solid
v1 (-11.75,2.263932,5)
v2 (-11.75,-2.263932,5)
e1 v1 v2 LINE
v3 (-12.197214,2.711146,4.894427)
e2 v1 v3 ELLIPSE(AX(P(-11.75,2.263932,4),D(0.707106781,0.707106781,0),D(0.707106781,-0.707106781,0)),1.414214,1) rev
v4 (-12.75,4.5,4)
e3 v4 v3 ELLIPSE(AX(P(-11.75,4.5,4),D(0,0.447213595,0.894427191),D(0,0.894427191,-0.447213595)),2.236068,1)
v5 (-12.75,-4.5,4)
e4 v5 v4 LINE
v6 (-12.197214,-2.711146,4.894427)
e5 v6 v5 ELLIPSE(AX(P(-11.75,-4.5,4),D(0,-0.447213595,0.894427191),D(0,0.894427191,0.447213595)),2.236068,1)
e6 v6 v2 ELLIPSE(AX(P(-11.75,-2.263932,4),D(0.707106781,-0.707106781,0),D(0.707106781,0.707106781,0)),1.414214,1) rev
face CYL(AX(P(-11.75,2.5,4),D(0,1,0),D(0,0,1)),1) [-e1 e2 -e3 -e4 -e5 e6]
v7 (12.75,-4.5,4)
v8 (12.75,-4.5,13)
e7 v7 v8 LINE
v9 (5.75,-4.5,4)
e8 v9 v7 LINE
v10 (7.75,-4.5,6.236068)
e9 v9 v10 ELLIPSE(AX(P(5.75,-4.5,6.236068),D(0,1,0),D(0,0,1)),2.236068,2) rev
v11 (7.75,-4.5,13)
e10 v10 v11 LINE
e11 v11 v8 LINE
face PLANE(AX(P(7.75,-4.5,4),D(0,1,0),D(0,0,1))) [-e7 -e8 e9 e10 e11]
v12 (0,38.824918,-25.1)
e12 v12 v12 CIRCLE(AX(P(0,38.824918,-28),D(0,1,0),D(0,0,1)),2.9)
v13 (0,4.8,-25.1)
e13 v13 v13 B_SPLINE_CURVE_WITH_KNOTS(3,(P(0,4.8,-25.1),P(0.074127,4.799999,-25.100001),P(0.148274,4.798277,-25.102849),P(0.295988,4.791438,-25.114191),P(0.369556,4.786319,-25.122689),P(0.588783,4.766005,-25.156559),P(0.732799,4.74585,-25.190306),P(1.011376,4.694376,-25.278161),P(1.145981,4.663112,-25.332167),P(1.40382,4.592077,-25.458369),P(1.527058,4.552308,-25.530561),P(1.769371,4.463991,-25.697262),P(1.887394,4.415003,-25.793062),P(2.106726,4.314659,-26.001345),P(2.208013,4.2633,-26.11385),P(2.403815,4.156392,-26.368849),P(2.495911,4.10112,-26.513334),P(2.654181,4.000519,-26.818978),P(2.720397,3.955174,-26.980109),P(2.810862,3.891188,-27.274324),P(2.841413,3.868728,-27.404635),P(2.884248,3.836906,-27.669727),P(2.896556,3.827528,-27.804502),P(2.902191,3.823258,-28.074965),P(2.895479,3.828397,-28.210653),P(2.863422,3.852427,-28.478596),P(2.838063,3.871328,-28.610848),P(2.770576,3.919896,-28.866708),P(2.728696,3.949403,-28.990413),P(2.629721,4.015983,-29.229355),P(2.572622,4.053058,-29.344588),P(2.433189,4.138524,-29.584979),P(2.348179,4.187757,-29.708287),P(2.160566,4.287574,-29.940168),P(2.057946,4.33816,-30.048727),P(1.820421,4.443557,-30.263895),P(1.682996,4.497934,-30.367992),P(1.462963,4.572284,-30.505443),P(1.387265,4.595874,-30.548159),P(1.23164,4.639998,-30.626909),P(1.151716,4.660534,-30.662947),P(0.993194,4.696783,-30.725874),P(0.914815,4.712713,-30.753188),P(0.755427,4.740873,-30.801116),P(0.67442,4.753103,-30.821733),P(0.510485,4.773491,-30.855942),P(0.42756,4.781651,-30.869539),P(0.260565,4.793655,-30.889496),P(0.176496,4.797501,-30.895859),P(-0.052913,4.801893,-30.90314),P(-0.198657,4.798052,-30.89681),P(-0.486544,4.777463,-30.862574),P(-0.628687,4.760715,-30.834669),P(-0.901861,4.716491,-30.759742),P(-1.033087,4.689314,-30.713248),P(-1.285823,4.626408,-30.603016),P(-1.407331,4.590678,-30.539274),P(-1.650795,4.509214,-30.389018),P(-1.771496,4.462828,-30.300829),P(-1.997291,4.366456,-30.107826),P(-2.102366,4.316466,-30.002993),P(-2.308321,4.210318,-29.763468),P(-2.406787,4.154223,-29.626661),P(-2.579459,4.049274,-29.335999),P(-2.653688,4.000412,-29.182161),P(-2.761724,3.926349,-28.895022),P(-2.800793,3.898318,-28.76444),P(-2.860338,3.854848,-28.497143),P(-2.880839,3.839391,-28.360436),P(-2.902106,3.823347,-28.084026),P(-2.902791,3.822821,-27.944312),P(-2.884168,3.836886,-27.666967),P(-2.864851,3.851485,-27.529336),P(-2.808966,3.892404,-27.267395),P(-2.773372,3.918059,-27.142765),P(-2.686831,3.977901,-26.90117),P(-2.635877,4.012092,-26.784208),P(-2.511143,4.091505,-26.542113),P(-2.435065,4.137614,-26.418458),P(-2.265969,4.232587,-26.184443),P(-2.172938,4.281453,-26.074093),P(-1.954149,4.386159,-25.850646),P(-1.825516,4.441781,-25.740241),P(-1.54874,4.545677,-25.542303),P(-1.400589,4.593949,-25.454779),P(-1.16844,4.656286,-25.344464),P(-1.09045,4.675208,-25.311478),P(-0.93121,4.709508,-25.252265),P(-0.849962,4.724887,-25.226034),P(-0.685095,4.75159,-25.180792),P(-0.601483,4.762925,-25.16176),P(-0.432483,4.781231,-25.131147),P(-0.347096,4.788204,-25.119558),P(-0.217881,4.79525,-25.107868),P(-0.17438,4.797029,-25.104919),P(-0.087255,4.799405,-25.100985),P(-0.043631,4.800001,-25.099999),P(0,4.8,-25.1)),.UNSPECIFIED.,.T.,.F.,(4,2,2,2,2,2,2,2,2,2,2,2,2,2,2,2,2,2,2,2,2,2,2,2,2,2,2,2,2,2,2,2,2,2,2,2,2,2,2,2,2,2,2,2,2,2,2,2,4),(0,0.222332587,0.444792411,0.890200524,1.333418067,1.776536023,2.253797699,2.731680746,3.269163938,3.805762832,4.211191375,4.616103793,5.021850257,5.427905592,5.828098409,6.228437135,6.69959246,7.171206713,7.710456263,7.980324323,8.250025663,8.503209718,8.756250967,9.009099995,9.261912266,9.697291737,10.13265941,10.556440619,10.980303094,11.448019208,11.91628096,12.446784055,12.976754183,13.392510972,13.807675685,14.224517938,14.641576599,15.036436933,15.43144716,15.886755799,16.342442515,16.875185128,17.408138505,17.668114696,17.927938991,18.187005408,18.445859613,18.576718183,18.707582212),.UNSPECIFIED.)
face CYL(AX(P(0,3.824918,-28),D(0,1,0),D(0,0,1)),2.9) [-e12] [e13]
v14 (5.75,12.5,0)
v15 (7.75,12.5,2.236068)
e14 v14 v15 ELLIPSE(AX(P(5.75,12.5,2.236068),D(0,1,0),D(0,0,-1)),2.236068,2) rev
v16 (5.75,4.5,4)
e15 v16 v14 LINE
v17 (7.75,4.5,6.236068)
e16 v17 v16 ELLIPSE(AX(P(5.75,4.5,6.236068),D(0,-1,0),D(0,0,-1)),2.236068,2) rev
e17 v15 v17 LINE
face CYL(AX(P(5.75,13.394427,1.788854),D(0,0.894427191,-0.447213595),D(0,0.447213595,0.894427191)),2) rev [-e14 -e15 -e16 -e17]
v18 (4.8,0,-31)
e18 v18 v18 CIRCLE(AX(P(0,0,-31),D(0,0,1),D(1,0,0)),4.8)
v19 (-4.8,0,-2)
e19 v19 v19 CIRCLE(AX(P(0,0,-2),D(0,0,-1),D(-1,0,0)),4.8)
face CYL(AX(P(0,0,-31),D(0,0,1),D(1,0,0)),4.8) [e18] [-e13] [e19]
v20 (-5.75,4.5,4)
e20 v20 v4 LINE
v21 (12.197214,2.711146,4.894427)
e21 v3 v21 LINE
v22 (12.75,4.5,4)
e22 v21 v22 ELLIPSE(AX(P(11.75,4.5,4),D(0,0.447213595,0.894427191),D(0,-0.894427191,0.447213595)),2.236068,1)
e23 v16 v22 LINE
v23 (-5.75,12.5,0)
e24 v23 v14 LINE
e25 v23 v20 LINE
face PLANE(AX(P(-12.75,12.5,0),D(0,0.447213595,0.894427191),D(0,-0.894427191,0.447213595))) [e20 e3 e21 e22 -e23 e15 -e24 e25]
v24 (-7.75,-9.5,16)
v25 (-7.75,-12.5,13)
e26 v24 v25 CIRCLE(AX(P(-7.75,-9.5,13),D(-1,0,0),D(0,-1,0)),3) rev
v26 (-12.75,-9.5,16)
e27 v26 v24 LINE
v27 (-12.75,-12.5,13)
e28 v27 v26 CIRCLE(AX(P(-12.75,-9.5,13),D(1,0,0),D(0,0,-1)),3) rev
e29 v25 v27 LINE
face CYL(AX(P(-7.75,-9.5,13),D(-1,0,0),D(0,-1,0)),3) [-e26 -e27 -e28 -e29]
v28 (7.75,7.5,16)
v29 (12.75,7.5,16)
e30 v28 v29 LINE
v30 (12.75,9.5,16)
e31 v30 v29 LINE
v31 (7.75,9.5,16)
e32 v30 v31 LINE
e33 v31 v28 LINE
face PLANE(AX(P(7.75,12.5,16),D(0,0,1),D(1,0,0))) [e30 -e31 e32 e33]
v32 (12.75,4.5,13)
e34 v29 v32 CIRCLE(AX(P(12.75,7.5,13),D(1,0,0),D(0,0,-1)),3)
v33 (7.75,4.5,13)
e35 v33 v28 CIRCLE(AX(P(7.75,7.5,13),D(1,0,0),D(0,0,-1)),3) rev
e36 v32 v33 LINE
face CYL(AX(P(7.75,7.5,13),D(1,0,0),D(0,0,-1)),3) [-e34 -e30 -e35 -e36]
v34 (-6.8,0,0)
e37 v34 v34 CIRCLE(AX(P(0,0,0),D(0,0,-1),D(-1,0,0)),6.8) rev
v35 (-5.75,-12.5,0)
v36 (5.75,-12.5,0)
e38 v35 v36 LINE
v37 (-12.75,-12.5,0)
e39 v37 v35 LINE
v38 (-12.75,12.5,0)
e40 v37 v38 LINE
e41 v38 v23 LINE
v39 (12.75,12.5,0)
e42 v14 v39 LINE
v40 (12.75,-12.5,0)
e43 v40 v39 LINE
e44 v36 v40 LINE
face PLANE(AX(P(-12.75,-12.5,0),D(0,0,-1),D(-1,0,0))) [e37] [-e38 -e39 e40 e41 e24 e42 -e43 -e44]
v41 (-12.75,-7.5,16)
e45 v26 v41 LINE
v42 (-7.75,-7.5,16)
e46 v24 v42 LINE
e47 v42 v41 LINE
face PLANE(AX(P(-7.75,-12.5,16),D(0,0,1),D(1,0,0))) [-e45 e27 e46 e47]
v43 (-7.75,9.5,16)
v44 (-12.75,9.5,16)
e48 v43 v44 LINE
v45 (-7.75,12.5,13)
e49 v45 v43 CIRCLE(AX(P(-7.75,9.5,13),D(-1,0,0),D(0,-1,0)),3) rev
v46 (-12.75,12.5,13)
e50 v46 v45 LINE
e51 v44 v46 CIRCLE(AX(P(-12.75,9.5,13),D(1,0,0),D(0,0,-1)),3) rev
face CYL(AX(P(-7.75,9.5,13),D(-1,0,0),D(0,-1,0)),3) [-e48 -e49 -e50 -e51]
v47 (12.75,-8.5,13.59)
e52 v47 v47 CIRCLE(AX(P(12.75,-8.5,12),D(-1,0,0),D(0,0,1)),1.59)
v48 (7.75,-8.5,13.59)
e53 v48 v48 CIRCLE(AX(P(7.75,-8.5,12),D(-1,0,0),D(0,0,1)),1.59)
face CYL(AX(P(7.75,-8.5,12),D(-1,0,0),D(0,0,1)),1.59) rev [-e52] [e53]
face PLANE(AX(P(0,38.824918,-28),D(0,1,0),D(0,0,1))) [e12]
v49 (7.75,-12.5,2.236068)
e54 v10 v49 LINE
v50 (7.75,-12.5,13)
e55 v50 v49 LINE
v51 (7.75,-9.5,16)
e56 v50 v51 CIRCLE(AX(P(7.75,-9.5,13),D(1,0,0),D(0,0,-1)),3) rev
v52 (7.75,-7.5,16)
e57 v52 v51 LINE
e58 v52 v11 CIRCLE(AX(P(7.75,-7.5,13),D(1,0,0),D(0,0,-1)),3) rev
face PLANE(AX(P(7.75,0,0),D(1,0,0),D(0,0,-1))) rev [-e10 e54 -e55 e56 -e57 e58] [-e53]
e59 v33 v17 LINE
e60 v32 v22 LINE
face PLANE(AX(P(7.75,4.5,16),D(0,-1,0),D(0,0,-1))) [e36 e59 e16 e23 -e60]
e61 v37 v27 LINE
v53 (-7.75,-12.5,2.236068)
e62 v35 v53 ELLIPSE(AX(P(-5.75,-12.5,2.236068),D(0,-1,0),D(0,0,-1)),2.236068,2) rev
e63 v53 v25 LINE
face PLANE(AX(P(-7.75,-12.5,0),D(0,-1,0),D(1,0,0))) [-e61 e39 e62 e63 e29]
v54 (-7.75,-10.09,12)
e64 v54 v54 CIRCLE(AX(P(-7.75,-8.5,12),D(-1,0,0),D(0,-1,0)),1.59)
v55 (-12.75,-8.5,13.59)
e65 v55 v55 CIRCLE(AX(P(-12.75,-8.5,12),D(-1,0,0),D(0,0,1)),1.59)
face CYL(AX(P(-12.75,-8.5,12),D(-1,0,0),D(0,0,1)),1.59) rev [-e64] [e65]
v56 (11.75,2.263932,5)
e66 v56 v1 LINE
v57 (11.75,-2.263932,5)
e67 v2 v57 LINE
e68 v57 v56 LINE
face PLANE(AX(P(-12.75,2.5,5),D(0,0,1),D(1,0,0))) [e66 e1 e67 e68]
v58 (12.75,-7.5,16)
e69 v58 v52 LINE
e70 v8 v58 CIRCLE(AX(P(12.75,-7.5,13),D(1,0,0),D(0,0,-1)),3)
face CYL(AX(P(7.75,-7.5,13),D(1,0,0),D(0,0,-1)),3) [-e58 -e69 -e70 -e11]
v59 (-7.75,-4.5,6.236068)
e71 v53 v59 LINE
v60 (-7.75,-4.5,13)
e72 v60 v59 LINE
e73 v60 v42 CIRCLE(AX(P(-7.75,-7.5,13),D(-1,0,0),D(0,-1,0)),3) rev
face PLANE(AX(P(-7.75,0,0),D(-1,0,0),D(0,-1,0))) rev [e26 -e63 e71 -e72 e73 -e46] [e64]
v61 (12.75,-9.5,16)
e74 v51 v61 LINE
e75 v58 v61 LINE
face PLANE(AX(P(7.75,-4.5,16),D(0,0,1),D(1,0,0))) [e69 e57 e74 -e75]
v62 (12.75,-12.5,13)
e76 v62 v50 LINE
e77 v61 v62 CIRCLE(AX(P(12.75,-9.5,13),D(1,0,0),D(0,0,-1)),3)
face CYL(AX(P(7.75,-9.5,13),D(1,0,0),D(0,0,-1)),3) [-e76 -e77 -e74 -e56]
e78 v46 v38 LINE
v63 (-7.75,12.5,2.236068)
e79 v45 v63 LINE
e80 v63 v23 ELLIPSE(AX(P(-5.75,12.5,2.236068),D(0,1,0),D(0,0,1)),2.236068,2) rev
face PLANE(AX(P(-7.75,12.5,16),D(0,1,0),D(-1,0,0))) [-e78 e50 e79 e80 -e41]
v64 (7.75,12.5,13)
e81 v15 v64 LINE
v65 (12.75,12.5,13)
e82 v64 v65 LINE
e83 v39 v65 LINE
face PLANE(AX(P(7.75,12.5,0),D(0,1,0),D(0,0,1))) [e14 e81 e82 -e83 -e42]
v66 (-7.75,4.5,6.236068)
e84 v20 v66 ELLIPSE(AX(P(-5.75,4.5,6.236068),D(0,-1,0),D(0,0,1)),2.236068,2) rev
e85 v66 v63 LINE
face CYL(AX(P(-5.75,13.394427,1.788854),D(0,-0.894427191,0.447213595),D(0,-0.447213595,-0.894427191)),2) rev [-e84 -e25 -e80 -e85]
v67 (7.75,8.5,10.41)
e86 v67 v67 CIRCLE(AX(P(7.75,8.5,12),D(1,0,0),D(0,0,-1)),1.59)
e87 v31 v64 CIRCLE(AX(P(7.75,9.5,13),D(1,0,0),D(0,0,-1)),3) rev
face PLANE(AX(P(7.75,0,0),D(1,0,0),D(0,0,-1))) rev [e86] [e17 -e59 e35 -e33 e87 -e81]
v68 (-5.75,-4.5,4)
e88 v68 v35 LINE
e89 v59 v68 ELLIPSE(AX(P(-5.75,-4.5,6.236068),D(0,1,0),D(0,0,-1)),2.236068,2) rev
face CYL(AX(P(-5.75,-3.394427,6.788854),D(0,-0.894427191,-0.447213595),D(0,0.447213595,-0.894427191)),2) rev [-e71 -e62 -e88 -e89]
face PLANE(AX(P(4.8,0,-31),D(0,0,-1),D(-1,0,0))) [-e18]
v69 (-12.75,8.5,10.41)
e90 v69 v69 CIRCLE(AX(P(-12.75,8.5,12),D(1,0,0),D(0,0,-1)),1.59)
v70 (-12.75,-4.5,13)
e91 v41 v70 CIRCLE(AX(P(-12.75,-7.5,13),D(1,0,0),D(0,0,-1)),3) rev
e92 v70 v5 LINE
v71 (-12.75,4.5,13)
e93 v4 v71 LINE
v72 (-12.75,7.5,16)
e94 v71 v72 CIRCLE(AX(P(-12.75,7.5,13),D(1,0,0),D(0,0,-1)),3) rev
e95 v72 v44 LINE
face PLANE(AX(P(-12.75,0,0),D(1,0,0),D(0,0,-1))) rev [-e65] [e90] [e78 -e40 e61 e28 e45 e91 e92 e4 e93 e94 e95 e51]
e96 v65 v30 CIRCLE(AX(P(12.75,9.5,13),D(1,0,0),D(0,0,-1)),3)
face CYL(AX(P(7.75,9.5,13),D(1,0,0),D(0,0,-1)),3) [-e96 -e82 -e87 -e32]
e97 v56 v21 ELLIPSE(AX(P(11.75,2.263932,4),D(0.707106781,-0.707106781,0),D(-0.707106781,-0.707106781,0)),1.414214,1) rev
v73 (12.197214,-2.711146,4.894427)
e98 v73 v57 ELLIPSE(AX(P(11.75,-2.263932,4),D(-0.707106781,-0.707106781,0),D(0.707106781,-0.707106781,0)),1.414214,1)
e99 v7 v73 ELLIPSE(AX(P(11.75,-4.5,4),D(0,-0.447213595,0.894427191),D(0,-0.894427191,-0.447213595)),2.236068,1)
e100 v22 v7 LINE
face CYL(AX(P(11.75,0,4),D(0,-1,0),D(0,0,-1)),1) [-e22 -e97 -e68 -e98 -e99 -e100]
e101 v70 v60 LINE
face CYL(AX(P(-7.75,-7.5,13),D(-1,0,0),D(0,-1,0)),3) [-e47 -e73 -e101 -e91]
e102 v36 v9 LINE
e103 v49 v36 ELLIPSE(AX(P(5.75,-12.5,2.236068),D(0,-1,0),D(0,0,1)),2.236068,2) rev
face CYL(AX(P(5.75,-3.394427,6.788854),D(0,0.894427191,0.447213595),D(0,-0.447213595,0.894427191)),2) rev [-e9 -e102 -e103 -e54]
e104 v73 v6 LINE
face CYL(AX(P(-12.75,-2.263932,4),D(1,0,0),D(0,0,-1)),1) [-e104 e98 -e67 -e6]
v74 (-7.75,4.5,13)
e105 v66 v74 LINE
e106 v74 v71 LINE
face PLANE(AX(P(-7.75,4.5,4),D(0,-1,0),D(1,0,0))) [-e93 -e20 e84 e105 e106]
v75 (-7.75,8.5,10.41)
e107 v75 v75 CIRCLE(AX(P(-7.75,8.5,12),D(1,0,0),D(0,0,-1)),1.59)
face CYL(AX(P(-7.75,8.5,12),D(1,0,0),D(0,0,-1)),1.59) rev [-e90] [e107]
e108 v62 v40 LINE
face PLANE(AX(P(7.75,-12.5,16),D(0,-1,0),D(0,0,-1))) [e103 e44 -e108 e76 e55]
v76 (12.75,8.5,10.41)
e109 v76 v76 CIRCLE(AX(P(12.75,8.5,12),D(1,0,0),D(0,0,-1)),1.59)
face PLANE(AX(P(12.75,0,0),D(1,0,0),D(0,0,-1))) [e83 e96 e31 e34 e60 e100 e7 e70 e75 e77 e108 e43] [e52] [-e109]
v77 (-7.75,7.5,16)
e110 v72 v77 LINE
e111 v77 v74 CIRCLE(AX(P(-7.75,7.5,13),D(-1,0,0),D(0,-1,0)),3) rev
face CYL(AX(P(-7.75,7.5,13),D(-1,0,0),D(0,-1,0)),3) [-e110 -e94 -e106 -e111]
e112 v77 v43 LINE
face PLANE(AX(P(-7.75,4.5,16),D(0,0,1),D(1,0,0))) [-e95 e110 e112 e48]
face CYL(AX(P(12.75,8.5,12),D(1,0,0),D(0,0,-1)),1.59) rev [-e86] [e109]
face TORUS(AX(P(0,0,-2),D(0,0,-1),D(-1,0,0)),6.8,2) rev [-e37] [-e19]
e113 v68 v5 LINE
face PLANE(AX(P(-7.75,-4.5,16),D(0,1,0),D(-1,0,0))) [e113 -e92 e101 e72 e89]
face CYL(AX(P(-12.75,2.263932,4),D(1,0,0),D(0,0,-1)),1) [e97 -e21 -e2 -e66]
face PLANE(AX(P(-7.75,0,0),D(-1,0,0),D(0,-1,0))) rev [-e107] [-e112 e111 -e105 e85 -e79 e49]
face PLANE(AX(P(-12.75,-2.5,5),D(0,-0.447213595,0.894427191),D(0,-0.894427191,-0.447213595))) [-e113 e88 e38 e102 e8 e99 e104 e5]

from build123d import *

# Parameters (mm, degrees)
BOSS_EXTRU_1_DEPTH = 25.5
BOSS_EXTRU_2_DEPTH = 5
BOSS_EXTRU_3_DEPTH = 5
BOSS_EXTRU_4_DEPTH = 5
BOSS_EXTRU_5_DEPTH = 5
ESQUISSE6_W        = 4.8
ESQUISSE6_H        = 31
ESQUISSE7_W        = 2.9
ESQUISSE7_H        = 35
PER_AGE1_D         = 3.18
PER_AGE1_DEPTH     = 5
PER_AGE2_D         = 3.18
PER_AGE3_D         = 3.18
PER_AGE3_DEPTH     = 5
PER_AGE4_D         = 3.18
CONG_1_R           = 1
CONG_2_R           = 2
CONG_3_R           = 3


with BuildPart() as part:
    # Esquisse1 → Boss.-Extru.1 (new body)
    with BuildSketch(Plane(origin=(12.75, 0, 0), x_dir=(0, 0, -1), z_dir=(1, 0, 0))):
        Polygon((-5, -2.5), (0, -12.5), (0, 12.5), (-5, 2.5), align=None)
    extrude(amount=-BOSS_EXTRU_1_DEPTH)

    # Esquisse2 → Boss.-Extru.2 (add)
    with BuildSketch(Plane(origin=(-12.75, 0, 0), x_dir=(0, -1, 0), z_dir=(-1, 0, 0))):
        Polygon((4.5, 16), (4.5, 4), (12.5, 0), (12.5, 16), align=None)
    extrude(amount=-BOSS_EXTRU_2_DEPTH)

    # Esquisse3 → Boss.-Extru.3 (add)
    with BuildSketch(Plane(origin=(12.75, 0, 0), x_dir=(0, 0, -1), z_dir=(1, 0, 0))):
        Polygon((-16, -12.5), (0, -12.5), (-4, -4.5), (-16, -4.5), align=None)
    extrude(amount=-BOSS_EXTRU_3_DEPTH)

    # Esquisse4 → Boss.-Extru.4 (add)
    with BuildSketch(Plane(origin=(12.75, 0, 0), x_dir=(0, 0, -1), z_dir=(1, 0, 0))):
        Polygon((-16, 4.5), (-4, 4.5), (0, 12.5), (-16, 12.5), align=None)
    extrude(amount=-BOSS_EXTRU_4_DEPTH)

    # Esquisse5 → Boss.-Extru.5 (add)
    with BuildSketch(Plane(origin=(-12.75, 0, 0), x_dir=(0, -1, 0), z_dir=(-1, 0, 0))):
        Polygon((-4.5, 16), (-12.5, 16), (-12.5, 0), (-4.5, 4), align=None)
    extrude(amount=-BOSS_EXTRU_5_DEPTH)

    # Esquisse6 → Révolution1 (revolve)
    with BuildSketch(Plane(origin=(0, 0, 0), x_dir=(1, 0, 0), z_dir=(0, 1, 0))):
        with Locations((2.4, 15.5)):
            Rectangle(ESQUISSE6_W, ESQUISSE6_H)
    revolve(axis=Axis((0, 0, -31), (0, 0, 1)))

    # Esquisse7 → Révolution2 (revolve)
    with BuildSketch(Plane(origin=(0.009791841, 0, -27.999996576), x_dir=(0.999999938851933, 0, 0.0003497086364192443), z_dir=(-0.0003497086364192443, 0, 0.999999938851933)), mode=Mode.PRIVATE) as r_volution2_sk:
        with Locations((-1.459791842, 21.3249183)):
            Rectangle(ESQUISSE7_W, ESQUISSE7_H)
    revolve(r_volution2_sk.sketch.rotate(Axis((0, 3.8249183, -28), (0, 1, 0)), 90.020036829), axis=Axis((0, 3.8249183, -28), (0, 1, 0)))

    # Perçage1
    with Locations(Plane.ZY.offset(12.75)):
        with Locations((12, -8.5)):
            Hole(PER_AGE1_D / 2, depth=PER_AGE1_DEPTH)

    # Perçage2 (through all)
    with Locations(Plane.ZY.offset(-7.75)):
        with Locations((12, -8.5)):
            Hole(PER_AGE2_D / 2)

    # Perçage3
    with Locations(Plane(origin=(12.75, 0, 0), x_dir=(0, 0, -1), z_dir=(1, 0, 0))):
        with Locations((-12, 8.5)):
            Hole(PER_AGE3_D / 2, depth=PER_AGE3_DEPTH)

    # Perçage4 (through all)
    with Locations(Plane(origin=(-7.75, 0, 0), x_dir=(0, 0, -1), z_dir=(1, 0, 0))):
        with Locations((-12, 8.5)):
            Hole(PER_AGE4_D / 2)

    # Congé1
    cong_1_edges = [part.edges().sort_by_distance(p)[0] for p in [
        (12.75, 0, 5),
        (-12.75, 0, 5),
        (0, -2.5, 5),
        (0, 2.5, 5),
    ]]
    fillet(cong_1_edges, radius=CONG_1_R - 0.0001)  # a hair under: the kernel refuses the full size

    # Congé2
    cong_2_edges = [part.edges().sort_by_distance(p)[0] for p in [
        (-7.75, -8.5, 2),
        (7.75, -8.5, 2),
        (7.75, 8.5, 2),
        (-7.75, 8.5, 2),
        (-4.8, 0, 0),
    ]]
    fillet(cong_2_edges, radius=CONG_2_R)

    # Congé3
    cong_3_edges = [part.edges().sort_by_distance(p)[0] for p in [
        (-10.25, -4.5, 16),
        (-10.25, -12.5, 16),
        (10.25, -12.5, 16),
        (10.25, -4.5, 16),
        (10.25, 4.5, 16),
        (10.25, 12.5, 16),
        (-10.25, 4.5, 16),
        (-10.25, 12.5, 16),
    ]]
    fillet(cong_3_edges, radius=CONG_3_R)


solid = part.part
